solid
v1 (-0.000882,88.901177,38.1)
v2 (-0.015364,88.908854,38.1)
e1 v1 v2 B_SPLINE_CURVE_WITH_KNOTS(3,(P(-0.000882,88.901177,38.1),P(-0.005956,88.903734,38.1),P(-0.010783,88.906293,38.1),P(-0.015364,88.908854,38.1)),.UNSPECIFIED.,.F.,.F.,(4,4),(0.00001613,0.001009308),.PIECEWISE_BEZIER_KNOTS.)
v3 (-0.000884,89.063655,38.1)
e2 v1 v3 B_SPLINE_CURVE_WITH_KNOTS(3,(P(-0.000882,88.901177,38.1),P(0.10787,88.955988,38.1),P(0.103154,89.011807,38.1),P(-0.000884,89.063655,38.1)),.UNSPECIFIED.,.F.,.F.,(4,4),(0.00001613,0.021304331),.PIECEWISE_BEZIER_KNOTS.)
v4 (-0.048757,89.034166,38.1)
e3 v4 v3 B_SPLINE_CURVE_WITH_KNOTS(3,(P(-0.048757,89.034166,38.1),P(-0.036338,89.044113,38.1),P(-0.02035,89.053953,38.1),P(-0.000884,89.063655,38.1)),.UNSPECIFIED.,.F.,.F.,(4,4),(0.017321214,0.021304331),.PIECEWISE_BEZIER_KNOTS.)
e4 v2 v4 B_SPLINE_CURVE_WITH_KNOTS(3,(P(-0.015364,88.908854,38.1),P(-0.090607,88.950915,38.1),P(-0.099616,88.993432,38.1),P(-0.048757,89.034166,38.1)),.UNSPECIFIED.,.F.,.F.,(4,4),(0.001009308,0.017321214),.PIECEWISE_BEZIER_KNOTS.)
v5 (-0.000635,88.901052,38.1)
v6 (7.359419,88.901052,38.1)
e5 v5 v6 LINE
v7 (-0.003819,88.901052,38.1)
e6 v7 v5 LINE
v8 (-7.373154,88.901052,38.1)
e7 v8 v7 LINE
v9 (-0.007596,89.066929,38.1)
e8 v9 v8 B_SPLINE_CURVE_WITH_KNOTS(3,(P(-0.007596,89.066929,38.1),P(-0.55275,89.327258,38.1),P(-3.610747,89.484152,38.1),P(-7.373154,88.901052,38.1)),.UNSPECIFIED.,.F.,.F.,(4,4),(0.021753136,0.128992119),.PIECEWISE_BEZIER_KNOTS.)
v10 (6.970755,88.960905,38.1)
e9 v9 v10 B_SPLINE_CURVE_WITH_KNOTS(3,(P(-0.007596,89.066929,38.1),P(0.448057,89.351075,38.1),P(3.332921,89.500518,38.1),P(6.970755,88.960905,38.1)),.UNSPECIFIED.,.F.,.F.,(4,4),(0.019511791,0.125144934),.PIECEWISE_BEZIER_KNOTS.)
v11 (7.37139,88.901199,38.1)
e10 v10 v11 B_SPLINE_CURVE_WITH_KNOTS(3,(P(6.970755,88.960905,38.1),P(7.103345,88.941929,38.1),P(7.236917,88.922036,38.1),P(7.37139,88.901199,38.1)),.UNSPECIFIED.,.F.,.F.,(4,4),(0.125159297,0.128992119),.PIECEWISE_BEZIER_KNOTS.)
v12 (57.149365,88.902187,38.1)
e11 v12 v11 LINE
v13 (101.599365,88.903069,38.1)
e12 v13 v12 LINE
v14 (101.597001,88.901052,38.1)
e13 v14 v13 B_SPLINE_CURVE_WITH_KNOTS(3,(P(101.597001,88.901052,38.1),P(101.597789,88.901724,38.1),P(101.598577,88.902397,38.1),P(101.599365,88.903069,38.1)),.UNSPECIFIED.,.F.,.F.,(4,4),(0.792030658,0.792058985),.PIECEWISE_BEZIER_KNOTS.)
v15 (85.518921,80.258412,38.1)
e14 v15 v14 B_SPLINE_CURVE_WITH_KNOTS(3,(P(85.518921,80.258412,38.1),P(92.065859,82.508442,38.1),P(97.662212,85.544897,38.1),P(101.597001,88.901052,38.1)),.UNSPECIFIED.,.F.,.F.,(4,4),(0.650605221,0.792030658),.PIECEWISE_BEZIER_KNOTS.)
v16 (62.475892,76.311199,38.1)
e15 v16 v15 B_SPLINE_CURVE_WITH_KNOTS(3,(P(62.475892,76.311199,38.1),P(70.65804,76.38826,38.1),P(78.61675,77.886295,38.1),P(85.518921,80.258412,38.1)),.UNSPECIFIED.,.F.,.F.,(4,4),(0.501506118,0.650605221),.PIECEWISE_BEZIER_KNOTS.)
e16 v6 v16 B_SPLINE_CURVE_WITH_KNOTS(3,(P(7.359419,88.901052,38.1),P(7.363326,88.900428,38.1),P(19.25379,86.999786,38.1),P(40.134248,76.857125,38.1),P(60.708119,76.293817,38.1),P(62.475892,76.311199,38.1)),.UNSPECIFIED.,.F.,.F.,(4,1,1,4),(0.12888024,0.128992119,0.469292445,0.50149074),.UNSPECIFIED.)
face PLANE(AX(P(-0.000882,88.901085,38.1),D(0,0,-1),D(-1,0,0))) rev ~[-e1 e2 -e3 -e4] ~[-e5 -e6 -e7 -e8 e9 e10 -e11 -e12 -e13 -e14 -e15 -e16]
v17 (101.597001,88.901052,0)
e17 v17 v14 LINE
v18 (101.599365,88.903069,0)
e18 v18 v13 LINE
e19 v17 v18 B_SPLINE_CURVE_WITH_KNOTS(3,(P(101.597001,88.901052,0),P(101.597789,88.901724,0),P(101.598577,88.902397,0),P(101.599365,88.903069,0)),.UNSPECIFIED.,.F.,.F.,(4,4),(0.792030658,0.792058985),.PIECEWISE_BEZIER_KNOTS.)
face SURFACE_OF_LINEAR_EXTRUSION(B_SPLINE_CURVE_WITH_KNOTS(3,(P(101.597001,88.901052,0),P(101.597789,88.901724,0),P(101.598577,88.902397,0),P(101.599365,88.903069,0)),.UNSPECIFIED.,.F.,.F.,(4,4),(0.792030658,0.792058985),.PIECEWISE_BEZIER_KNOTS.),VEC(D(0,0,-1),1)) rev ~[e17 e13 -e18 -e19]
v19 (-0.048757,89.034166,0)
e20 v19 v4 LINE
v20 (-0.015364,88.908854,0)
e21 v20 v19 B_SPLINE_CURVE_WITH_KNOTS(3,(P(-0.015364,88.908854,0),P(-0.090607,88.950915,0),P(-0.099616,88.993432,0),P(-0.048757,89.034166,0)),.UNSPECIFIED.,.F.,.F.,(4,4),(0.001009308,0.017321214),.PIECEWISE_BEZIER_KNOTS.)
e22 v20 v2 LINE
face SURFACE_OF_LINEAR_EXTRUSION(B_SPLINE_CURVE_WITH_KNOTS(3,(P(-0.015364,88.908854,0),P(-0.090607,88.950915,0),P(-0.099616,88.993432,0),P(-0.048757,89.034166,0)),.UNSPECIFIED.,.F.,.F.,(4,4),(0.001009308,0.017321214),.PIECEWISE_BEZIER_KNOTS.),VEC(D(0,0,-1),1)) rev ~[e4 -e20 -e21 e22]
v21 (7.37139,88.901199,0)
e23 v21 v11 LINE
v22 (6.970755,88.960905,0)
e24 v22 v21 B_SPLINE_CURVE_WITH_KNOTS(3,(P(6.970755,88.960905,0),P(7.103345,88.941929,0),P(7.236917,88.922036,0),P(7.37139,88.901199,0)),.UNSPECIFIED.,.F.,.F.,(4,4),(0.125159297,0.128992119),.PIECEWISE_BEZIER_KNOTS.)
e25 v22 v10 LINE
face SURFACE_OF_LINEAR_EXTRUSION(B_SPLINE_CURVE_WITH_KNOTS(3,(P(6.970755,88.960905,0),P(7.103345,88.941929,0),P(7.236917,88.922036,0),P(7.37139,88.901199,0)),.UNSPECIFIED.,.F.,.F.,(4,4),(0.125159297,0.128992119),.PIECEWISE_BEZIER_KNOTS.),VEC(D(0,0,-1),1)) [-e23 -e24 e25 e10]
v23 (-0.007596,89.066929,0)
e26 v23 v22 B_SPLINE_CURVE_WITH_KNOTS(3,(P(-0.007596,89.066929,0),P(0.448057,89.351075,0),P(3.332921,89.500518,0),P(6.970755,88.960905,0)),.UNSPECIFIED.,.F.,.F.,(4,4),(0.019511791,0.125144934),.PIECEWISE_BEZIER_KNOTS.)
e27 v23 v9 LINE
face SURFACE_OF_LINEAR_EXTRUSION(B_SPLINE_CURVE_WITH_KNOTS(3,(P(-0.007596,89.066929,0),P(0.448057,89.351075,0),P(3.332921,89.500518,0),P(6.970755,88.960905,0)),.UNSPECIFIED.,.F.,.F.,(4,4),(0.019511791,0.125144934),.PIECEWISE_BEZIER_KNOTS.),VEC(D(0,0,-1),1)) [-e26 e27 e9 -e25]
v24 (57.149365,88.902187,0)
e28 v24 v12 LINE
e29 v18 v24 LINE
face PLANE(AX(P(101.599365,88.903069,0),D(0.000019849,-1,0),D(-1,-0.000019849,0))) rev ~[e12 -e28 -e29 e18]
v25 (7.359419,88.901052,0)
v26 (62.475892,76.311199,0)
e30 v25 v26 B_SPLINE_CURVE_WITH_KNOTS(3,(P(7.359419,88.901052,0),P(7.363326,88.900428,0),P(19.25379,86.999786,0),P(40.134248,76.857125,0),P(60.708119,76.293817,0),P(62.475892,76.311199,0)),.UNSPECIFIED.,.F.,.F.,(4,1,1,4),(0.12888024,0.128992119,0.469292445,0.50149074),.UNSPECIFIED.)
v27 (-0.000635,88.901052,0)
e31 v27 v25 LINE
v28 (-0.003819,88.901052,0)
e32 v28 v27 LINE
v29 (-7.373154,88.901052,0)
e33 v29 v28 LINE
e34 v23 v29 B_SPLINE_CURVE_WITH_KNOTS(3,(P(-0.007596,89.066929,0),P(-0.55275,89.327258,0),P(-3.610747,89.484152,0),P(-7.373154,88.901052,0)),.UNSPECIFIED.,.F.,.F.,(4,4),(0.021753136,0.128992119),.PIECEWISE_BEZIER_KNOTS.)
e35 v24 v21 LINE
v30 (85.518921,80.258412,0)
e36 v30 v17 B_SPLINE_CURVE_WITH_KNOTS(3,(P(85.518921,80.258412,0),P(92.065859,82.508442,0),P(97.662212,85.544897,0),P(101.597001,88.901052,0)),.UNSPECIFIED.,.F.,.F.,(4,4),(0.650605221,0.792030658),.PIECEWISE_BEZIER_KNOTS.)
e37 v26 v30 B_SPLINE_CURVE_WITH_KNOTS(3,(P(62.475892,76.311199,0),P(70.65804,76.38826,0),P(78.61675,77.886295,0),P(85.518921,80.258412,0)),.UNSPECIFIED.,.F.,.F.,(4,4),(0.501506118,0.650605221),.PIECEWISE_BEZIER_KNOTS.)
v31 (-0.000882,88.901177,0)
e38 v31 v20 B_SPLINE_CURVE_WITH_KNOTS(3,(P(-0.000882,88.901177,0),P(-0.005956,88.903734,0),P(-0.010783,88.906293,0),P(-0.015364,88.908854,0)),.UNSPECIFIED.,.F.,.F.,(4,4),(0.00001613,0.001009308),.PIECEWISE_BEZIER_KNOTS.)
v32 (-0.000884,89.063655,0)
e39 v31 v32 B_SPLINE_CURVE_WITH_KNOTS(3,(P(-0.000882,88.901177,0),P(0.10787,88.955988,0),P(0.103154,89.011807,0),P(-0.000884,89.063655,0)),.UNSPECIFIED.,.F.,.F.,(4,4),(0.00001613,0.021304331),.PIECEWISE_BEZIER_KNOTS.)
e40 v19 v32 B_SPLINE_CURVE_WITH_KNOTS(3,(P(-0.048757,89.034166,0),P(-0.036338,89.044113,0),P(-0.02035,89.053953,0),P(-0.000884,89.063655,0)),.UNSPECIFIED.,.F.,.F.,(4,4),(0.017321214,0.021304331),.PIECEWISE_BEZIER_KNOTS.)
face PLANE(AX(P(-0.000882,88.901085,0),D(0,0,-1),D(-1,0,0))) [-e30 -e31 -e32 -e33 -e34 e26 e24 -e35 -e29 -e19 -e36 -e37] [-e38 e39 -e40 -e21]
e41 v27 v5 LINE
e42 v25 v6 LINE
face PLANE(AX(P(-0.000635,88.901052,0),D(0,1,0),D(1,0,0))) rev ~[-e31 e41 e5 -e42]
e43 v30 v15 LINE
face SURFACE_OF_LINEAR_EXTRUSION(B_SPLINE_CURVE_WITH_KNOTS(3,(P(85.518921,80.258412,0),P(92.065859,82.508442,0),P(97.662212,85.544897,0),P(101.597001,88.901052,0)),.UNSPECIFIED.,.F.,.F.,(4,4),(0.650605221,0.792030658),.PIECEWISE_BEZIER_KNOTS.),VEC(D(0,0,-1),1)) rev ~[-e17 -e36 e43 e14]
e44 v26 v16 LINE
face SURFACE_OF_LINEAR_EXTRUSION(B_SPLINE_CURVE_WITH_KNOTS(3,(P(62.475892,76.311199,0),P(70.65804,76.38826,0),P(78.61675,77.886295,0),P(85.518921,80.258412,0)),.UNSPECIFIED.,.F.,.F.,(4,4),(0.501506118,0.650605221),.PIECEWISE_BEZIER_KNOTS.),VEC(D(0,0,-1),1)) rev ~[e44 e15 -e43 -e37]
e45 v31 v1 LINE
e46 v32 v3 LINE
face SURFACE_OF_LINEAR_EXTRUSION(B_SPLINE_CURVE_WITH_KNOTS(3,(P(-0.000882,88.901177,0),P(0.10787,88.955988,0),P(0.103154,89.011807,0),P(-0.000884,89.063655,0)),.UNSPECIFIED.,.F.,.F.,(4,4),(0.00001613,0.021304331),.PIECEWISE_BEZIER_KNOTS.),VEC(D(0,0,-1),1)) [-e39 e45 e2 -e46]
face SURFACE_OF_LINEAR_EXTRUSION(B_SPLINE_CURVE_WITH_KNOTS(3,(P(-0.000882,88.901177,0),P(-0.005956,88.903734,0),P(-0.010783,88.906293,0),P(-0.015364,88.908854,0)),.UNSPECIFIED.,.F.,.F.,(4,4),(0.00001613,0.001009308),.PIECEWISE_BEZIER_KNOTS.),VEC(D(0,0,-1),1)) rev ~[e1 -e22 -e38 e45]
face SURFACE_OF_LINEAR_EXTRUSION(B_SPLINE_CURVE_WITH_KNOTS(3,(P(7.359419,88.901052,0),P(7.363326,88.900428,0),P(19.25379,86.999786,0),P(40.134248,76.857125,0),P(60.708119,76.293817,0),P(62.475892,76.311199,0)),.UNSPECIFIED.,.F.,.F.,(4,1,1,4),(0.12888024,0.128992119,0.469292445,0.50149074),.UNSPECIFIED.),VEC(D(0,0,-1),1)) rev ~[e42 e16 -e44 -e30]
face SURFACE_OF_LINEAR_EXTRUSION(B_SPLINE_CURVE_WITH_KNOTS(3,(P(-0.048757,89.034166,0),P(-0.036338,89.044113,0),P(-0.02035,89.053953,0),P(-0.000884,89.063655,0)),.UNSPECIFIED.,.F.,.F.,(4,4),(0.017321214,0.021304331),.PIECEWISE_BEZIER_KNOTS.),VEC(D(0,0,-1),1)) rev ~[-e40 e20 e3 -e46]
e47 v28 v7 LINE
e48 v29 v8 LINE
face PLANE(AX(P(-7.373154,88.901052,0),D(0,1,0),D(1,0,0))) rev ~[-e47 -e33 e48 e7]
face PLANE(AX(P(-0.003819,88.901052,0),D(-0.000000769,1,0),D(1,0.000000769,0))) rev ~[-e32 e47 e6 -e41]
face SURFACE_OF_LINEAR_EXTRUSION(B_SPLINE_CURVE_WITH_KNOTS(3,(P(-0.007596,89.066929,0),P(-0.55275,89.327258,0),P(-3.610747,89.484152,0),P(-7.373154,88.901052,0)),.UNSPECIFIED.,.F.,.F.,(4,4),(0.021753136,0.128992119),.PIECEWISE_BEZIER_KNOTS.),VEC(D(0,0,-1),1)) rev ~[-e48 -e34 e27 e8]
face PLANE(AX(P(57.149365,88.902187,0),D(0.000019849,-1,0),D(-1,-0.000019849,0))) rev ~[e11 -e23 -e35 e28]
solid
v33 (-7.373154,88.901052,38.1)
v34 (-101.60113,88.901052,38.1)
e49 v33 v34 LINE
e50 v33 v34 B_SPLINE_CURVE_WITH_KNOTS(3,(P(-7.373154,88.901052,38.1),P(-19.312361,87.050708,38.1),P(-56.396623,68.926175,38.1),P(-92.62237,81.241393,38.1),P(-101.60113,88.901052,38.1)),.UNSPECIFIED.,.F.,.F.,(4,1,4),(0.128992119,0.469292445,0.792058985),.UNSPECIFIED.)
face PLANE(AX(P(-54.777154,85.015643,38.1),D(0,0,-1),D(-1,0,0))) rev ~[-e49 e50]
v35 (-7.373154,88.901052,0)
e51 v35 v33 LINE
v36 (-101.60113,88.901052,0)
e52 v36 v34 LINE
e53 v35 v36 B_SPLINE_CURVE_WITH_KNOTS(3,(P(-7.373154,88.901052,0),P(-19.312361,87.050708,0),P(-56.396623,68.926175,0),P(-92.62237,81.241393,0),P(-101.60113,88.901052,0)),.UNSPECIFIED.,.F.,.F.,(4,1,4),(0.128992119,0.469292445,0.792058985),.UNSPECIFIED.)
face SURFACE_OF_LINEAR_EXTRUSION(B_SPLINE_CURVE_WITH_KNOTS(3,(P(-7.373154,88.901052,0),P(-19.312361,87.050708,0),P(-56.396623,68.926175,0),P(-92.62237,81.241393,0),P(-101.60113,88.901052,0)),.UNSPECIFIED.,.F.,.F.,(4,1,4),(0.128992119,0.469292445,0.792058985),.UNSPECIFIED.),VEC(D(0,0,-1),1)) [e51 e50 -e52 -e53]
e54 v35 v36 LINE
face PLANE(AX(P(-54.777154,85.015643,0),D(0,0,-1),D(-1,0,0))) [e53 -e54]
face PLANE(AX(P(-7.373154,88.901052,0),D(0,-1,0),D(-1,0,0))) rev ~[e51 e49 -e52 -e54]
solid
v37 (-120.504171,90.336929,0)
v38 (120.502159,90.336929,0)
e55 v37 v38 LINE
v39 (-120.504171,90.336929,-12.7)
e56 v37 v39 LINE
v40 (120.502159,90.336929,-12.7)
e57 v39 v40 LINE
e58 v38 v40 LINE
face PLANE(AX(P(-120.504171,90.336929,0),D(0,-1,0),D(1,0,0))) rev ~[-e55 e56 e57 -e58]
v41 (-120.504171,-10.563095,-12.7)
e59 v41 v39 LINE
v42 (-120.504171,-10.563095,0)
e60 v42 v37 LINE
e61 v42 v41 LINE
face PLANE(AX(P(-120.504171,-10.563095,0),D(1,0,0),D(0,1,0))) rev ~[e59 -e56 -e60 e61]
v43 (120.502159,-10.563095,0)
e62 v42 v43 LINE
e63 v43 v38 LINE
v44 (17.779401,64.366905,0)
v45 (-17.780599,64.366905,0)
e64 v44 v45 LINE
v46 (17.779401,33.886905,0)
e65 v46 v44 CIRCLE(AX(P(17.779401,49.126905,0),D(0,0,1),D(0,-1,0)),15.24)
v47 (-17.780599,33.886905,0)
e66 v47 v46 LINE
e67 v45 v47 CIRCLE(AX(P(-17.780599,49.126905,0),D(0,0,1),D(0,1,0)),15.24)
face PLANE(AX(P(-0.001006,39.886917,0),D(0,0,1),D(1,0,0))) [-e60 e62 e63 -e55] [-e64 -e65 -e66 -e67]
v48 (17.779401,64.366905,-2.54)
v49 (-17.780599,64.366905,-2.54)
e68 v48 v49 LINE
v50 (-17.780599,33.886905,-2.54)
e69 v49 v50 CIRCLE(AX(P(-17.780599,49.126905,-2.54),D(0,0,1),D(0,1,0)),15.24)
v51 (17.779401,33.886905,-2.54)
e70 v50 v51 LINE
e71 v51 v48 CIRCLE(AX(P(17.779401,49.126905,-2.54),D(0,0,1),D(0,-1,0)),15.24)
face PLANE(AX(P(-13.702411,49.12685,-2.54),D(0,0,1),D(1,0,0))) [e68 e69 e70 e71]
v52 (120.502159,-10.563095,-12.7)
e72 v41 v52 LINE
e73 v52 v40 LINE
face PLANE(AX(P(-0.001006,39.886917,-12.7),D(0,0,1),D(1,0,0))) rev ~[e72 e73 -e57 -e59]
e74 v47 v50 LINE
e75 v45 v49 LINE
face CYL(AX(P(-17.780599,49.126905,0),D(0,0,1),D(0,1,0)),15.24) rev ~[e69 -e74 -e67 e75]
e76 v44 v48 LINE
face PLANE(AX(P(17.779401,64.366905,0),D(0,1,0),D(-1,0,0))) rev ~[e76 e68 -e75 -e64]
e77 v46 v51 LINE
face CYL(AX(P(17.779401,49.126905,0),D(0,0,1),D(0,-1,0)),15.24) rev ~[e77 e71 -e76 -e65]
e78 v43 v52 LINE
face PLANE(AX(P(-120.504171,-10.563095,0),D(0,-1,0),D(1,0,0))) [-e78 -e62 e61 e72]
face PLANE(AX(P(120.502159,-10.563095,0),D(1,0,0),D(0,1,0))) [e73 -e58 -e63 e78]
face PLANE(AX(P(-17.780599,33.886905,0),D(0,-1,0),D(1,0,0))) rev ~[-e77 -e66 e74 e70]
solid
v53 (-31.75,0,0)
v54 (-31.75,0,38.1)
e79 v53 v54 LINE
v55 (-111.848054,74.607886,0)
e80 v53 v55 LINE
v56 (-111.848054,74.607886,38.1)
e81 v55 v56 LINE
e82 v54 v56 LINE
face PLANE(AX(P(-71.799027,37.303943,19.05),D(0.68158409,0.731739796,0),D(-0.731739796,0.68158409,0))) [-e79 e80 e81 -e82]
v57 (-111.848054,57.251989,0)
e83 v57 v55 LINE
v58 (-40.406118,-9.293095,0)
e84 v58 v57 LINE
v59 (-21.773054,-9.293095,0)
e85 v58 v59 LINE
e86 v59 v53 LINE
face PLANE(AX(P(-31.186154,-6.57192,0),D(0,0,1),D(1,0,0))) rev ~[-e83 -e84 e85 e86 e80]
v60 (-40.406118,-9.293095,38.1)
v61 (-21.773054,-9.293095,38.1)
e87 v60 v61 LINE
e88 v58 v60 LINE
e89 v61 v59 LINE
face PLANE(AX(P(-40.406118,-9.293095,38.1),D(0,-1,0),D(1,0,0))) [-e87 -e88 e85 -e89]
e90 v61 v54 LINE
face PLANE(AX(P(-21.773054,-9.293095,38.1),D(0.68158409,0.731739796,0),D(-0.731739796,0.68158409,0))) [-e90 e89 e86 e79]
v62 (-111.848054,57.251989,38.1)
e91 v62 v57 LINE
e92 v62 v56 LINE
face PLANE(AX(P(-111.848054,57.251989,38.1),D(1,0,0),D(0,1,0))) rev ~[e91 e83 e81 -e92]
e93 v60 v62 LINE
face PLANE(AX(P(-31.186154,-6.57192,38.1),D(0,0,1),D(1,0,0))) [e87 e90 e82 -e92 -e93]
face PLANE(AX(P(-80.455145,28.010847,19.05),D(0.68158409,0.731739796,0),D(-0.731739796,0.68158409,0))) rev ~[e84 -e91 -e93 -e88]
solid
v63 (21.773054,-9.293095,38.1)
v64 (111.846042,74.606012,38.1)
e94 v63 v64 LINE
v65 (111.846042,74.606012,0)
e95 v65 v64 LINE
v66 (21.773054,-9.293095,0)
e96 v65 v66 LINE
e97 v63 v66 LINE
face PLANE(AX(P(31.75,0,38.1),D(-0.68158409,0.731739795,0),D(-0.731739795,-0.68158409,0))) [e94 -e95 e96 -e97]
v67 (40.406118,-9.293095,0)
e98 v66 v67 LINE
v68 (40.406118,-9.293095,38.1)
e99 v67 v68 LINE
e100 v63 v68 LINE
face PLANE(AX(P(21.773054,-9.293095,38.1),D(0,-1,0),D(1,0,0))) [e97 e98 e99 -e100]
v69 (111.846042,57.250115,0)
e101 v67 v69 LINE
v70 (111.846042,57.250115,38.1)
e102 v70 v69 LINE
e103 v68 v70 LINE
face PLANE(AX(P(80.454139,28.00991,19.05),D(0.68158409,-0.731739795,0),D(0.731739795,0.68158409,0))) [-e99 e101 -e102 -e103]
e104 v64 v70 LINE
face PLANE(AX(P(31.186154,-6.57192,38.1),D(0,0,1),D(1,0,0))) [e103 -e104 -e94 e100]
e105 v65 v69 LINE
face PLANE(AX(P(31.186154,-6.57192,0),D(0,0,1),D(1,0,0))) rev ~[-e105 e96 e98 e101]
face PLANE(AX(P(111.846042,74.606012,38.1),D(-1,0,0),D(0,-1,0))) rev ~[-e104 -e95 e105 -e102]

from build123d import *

# Parameters (mm, degrees)
F1_DEPTH         = 38.1
F2_E3_MIRRORCS_W = 109.4597315367
F2_E3_MIRRORCS_H = 38.1
F3_DEPTH         = 12.7
F2_E1_W          = 109.4624810587
F2_E1_H          = 38.1
F4_DEPTH         = 12.7
F6_DEPTH         = 38.1
F8_DEPTH         = 38.1
F9_W             = 241.0063309582
F9_H             = 100.9000240942
F10_DEPTH        = 12.7
F12_DEPTH        = 2.54
F14_DEPTH        = 38.1
F16_DEPTH        = 38.1


with BuildPart() as f1:
    # F0 (on Top) → F1 (new body)
    with BuildSketch(Plane.XY):
        with BuildLine():
            add(Edge.make_bspline(
                [(-7.3731541722, 88.9010522698), (-19.31236057, 87.050708456), (-56.3966234299, 68.9261750439), (-92.6223703207, 81.2413929209), (-101.6011297031, 88.9010522698)],
                knots=[0.1289921189, 0.1289921189, 0.1289921189, 0.1289921189, 0.4692924446, 0.7920589848, 0.7920589848, 0.7920589848, 0.7920589848], degree=3))
            Line((-7.3731541722, 88.9010522698), (-57.1511297031, 88.9010522698))
            Line((-57.1511297031, 88.9010522698), (-101.6011297031, 88.9010522698))
        make_face()
        with BuildLine():
            add(Edge.make_bspline(
                [(-0.0011297031, 88.9010522698), (-0.0010471723, 88.901093798), (-0.0009647066, 88.9011353269), (-0.0008823061, 88.9011768563)],
                knots=[0, 0, 0, 0, 1.61298e-05, 1.61298e-05, 1.61298e-05, 1.61298e-05], degree=3))
            Line((-0.0011297031, 88.9010522698), (-0.0006349067, 88.9010522698))
            add(Edge.make_bspline(
                [(-0.0006349067, 88.9010522747), (-0.0007174383, 88.9010938013), (-0.0007999048, 88.9011353285), (-0.0008823061, 88.9011768563)],
                knots=[0, 0, 0, 0, 1.61298e-05, 1.61298e-05, 1.61298e-05, 1.61298e-05], degree=3))
        make_face()
        with BuildLine():
            Line((-0.0038189409, 88.9010522698), (-0.0011297031, 88.9010522698))
            add(Edge.make_bspline(
                [(-0.0011297031, 88.9010522698), (-0.0010471723, 88.901093798), (-0.0009647066, 88.9011353269), (-0.0008823061, 88.9011768563)],
                knots=[0, 0, 0, 0, 1.61298e-05, 1.61298e-05, 1.61298e-05, 1.61298e-05], degree=3))
            add(Edge.make_bspline(
                [(-0.0008823061, 88.9011768563), (-0.0059560813, 88.9037338865), (-0.0107828824, 88.9062931167), (-0.0153641459, 88.9088540413)],
                knots=[1.61298e-05, 1.61298e-05, 1.61298e-05, 1.61298e-05, 0.0010093075, 0.0010093075, 0.0010093075, 0.0010093075], degree=3))
            add(Edge.make_bspline(
                [(-0.0038189409, 88.9010522698), (-0.0078539791, 88.9036552478), (-0.0117020651, 88.9062559427), (-0.0153641459, 88.9088540413)],
                knots=[0.0002095209, 0.0002095209, 0.0002095209, 0.0002095209, 0.001082787, 0.001082787, 0.001082787, 0.001082787], degree=3))
        make_face()
        with BuildLine():
            Line((-7.3731541722, 88.9010522698), (-0.0038189409, 88.9010522698))
            add(Edge.make_bspline(
                [(-0.0038189409, 88.9010522698), (-0.0078539791, 88.9036552478), (-0.0117020651, 88.9062559427), (-0.0153641459, 88.9088540413)],
                knots=[0.0002095209, 0.0002095209, 0.0002095209, 0.0002095209, 0.001082787, 0.001082787, 0.001082787, 0.001082787], degree=3))
            add(Edge.make_bspline(
                [(-0.0153641459, 88.9088540413), (-0.0906066198, 88.9509145567), (-0.0996162199, 88.9934321228), (-0.0487573192, 89.0341663757)],
                knots=[0.0010093075, 0.0010093075, 0.0010093075, 0.0010093075, 0.0173212144, 0.0173212144, 0.0173212144, 0.0173212144], degree=3))
            add(Edge.make_bspline(
                [(-0.0487573192, 89.0341663757), (-0.0385667228, 89.045259585), (-0.0248162276, 89.0561903305), (-0.0075963078, 89.0669286912)],
                knots=[0.0155197372, 0.0155197372, 0.0155197372, 0.0155197372, 0.0195117913, 0.0195117913, 0.0195117913, 0.0195117913], degree=3))
            add(Edge.make_bspline(
                [(-0.0075963078, 89.0669286912), (-0.5527500342, 89.3272580379), (-3.6107471198, 89.4841518814), (-7.3731541722, 88.9010522698)],
                knots=[0.0217531364, 0.0217531364, 0.0217531364, 0.0217531364, 0.1289921189, 0.1289921189, 0.1289921189, 0.1289921189], degree=3))
        make_face()
        with BuildLine():
            Line((7.358503656, 88.9011983473), (-0.0006349067, 88.9010522747))
            Line((-0.0006349067, 88.9010522698), (7.3594185793, 88.9010522698))
            add(Edge.make_bspline(
                [(7.358503656, 88.9011983473), (7.3588086257, 88.9011496596), (7.3591136001, 88.9011009671), (7.3594185793, 88.9010522698)],
                knots=[0.1288715075, 0.1288715075, 0.1288715075, 0.1288715075, 0.1288802405, 0.1288802405, 0.1288802405, 0.1288802405], degree=3))
        make_face()
        with BuildLine():
            add(Edge.make_bspline(
                [(-0.0006349067, 88.9010522747), (-0.0007174383, 88.9010938013), (-0.0007999048, 88.9011353285), (-0.0008823061, 88.9011768563)],
                knots=[0, 0, 0, 0, 1.61298e-05, 1.61298e-05, 1.61298e-05, 1.61298e-05], degree=3))
            Line((-0.0006349067, 88.9010522747), (7.358503656, 88.9011983473))
            add(Edge.make_bspline(
                [(6.9707545503, 88.9609054579), (7.0990916617, 88.9418687773), (7.2283658962, 88.9219745203), (7.358503656, 88.9011983473)],
                knots=[0.1251449345, 0.1251449345, 0.1251449345, 0.1251449345, 0.1288715075, 0.1288715075, 0.1288715075, 0.1288715075], degree=3))
            add(Edge.make_bspline(
                [(-0.0008839186, 89.0636547943), (0.5066620671, 89.3166069603), (3.3780640661, 89.4750941094), (6.9707545503, 88.9609054579)],
                knots=[0.0213043311, 0.0213043311, 0.0213043311, 0.0213043311, 0.1251592971, 0.1251592971, 0.1251592971, 0.1251592971], degree=3))
            add(Edge.make_bspline(
                [(-0.0008823061, 88.9011768563), (0.1078701091, 88.9559875108), (0.1031539373, 89.0118066991), (-0.0008839186, 89.0636547943)],
                knots=[1.61298e-05, 1.61298e-05, 1.61298e-05, 1.61298e-05, 0.0213043311, 0.0213043311, 0.0213043311, 0.0213043311], degree=3))
        make_face()
        with BuildLine():
            add(Edge.make_bspline(
                [(7.358503656, 88.9011983473), (7.3588086257, 88.9011496596), (7.3591136001, 88.9011009671), (7.3594185793, 88.9010522698)],
                knots=[0.1288715075, 0.1288715075, 0.1288715075, 0.1288715075, 0.1288802405, 0.1288802405, 0.1288802405, 0.1288802405], degree=3))
            Line((7.3594185793, 88.9010522698), (7.372333804, 88.9010522698))
            add(Edge.make_bspline(
                [(7.371389561, 88.901198603), (7.3717043037, 88.9011498305), (7.3720190514, 88.9011010527), (7.372333804, 88.9010522698)],
                knots=[0.1289921189, 0.1289921189, 0.1289921189, 0.1289921189, 0.1290010899, 0.1290010899, 0.1290010899, 0.1290010899], degree=3))
            Line((7.371389561, 88.901198603), (7.358503656, 88.9011983473))
        make_face()
        with BuildLine():
            Line((7.372333804, 88.9010522698), (7.3594185793, 88.9010522698))
            add(Edge.make_bspline(
                [(7.3594185793, 88.9010522698), (7.3633256696, 88.9004284077), (19.2537900005, 86.9997857358), (40.134248152, 76.8571245778), (60.7081186709, 76.2938170337), (62.4758923018, 76.3111989879)],
                knots=[0.1288802405, 0.1288802405, 0.1288802405, 0.1288802405, 0.1289921189, 0.4692924446, 0.5014907397, 0.5014907397, 0.5014907397, 0.5014907397], degree=3))
            add(Edge.make_bspline(
                [(7.372333804, 88.9010522698), (19.311636162, 87.0506013639), (40.1454385751, 76.8690456691), (60.7080947753, 76.2945495342), (62.4758923018, 76.3111989879)],
                knots=[0.1290010899, 0.1290010899, 0.1290010899, 0.1290010899, 0.4692924446, 0.5015061184, 0.5015061184, 0.5015061184, 0.5015061184], degree=3))
        make_face()
        with BuildLine():
            add(Edge.make_bspline(
                [(6.9707545503, 88.9609054579), (7.0990916617, 88.9418687773), (7.2283658962, 88.9219745203), (7.358503656, 88.9011983473)],
                knots=[0.1251449345, 0.1251449345, 0.1251449345, 0.1251449345, 0.1288715075, 0.1288715075, 0.1288715075, 0.1288715075], degree=3))
            Line((7.358503656, 88.9011983473), (7.371389561, 88.901198603))
            add(Edge.make_bspline(
                [(6.9707545503, 88.9609054579), (7.103344668, 88.9419290573), (7.2369171933, 88.9220364605), (7.371389561, 88.901198603)],
                knots=[0.1251592971, 0.1251592971, 0.1251592971, 0.1251592971, 0.1289921189, 0.1289921189, 0.1289921189, 0.1289921189], degree=3))
        make_face()
        with BuildLine():
            add(Edge.make_bspline(
                [(-0.0487573192, 89.0341663757), (-0.0363383579, 89.0441130537), (-0.0203496698, 89.0539533996), (-0.0008839186, 89.0636547943)],
                knots=[0.0173212144, 0.0173212144, 0.0173212144, 0.0173212144, 0.0213043311, 0.0213043311, 0.0213043311, 0.0213043311], degree=3))
            add(Edge.make_bspline(
                [(-0.0008839186, 89.0636547943), (-0.0030772808, 89.0647478738), (-0.0053147881, 89.0658391883), (-0.0075963078, 89.0669286912)],
                knots=[0.0213043311, 0.0213043311, 0.0213043311, 0.0213043311, 0.0217531364, 0.0217531364, 0.0217531364, 0.0217531364], degree=3))
            add(Edge.make_bspline(
                [(-0.0487573192, 89.0341663757), (-0.0385667228, 89.045259585), (-0.0248162276, 89.0561903305), (-0.0075963078, 89.0669286912)],
                knots=[0.0155197372, 0.0155197372, 0.0155197372, 0.0155197372, 0.0195117913, 0.0195117913, 0.0195117913, 0.0195117913], degree=3))
        make_face()
        with BuildLine():
            add(Edge.make_bspline(
                [(-0.0008839186, 89.0636547943), (-0.0030772808, 89.0647478738), (-0.0053147881, 89.0658391883), (-0.0075963078, 89.0669286912)],
                knots=[0.0213043311, 0.0213043311, 0.0213043311, 0.0213043311, 0.0217531364, 0.0217531364, 0.0217531364, 0.0217531364], degree=3))
            add(Edge.make_bspline(
                [(-0.0008839186, 89.0636547943), (0.5066620671, 89.3166069603), (3.3780640661, 89.4750941094), (6.9707545503, 88.9609054579)],
                knots=[0.0213043311, 0.0213043311, 0.0213043311, 0.0213043311, 0.1251592971, 0.1251592971, 0.1251592971, 0.1251592971], degree=3))
            add(Edge.make_bspline(
                [(-0.0075963078, 89.0669286912), (0.4480573981, 89.3510748377), (3.3329208845, 89.5005177095), (6.9707545503, 88.9609054579)],
                knots=[0.0195117913, 0.0195117913, 0.0195117913, 0.0195117913, 0.1251449345, 0.1251449345, 0.1251449345, 0.1251449345], degree=3))
        make_face()
        with BuildLine():
            add(Edge.make_bspline(
                [(7.371389561, 88.901198603), (7.3717043037, 88.9011498305), (7.3720190514, 88.9011010527), (7.372333804, 88.9010522698)],
                knots=[0.1289921189, 0.1289921189, 0.1289921189, 0.1289921189, 0.1290010899, 0.1290010899, 0.1290010899, 0.1290010899], degree=3))
            Line((7.372333804, 88.9010522698), (57.1488702969, 88.9010522698))
            Line((57.1488702969, 88.9010522698), (101.5970009453, 88.9010522698))
            add(Edge.make_bspline(
                [(101.5970009453, 88.9010522698), (101.5977890547, 88.9017244829), (101.5985770973, 88.9023967089), (101.5993650733, 88.9030689477)],
                knots=[0.7920306583, 0.7920306583, 0.7920306583, 0.7920306583, 0.7920589848, 0.7920589848, 0.7920589848, 0.7920589848], degree=3))
            Line((101.5993650733, 88.9030689477), (57.1493650821, 88.9021866532))
            Line((57.1493650821, 88.9021866532), (7.371389561, 88.901198603))
        make_face()
        with BuildLine():
            Line((57.1488702969, 88.9010522698), (7.372333804, 88.9010522698))
            add(Edge.make_bspline(
                [(7.372333804, 88.9010522698), (19.311636162, 87.0506013639), (40.1454385751, 76.8690456691), (60.7080947753, 76.2945495342), (62.4758923018, 76.3111989879)],
                knots=[0.1290010899, 0.1290010899, 0.1290010899, 0.1290010899, 0.4692924446, 0.5015061184, 0.5015061184, 0.5015061184, 0.5015061184], degree=3))
            add(Edge.make_bspline(
                [(62.4758923018, 76.3111989879), (70.6608896738, 76.3916794562), (78.6185391976, 77.8886425606), (85.5189213309, 80.2584115087)],
                knots=[0.5014907397, 0.5014907397, 0.5014907397, 0.5014907397, 0.6505725884, 0.6505725884, 0.6505725884, 0.6505725884], degree=3))
            add(Edge.make_bspline(
                [(85.5189213309, 80.2584115087), (92.0658589973, 82.5084423933), (97.6622116963, 85.5448972365), (101.5970009453, 88.9010522698)],
                knots=[0.650605221, 0.650605221, 0.650605221, 0.650605221, 0.7920306583, 0.7920306583, 0.7920306583, 0.7920306583], degree=3))
            Line((101.5970009453, 88.9010522698), (57.1488702969, 88.9010522698))
        make_face()
        with BuildLine():
            add(Edge.make_bspline(
                [(62.4758923018, 76.3111989879), (70.6608896738, 76.3916794562), (78.6185391976, 77.8886425606), (85.5189213309, 80.2584115087)],
                knots=[0.5014907397, 0.5014907397, 0.5014907397, 0.5014907397, 0.6505725884, 0.6505725884, 0.6505725884, 0.6505725884], degree=3))
            add(Edge.make_bspline(
                [(62.4758923018, 76.3111989879), (70.6580396422, 76.3882600096), (78.6167504823, 77.8862952047), (85.5189213309, 80.2584115087)],
                knots=[0.5015061184, 0.5015061184, 0.5015061184, 0.5015061184, 0.650605221, 0.650605221, 0.650605221, 0.650605221], degree=3))
        make_face()
    extrude(amount=F1_DEPTH)


with BuildPart() as f3:
    # F2_E3_MirrorCS (on explicit) → F3 (new body)
    with BuildSketch(Plane(origin=(31.75, 0, 0), x_dir=(0.7317397952, 0.6815840902, 0), z_dir=(0.6815840902, -0.7317397952, 0))):
        with Locations((54.7298657684, 19.05)):
            Rectangle(F2_E3_MIRRORCS_W, F2_E3_MIRRORCS_H)
    extrude(amount=F3_DEPTH)

    # F7 (on face) → F8 (join)
    with BuildSketch(Plane.XY.offset(38.1)):
        Polygon((40.406117946, -9.2930953996), (31.75, 0), (21.7730539089, -9.2930953996), align=None)
    extrude(amount=-F8_DEPTH)

    # F15 (on face) → F16 (cut)
    with BuildSketch(Plane.XY.offset(38.1)):
        Polygon((120.5021594878, 65.3129161372), (111.8460415418, 74.6060115367), (111.8460415418, 57.2501152433), align=None)
    extrude(amount=-F16_DEPTH, mode=Mode.SUBTRACT)


with BuildPart() as f4:
    # F2_E1 (on explicit) → F4 (new body)
    with BuildSketch(Plane(origin=(-31.75, 0, 0), x_dir=(-0.7317397957, 0.6815840897, 0), z_dir=(0.6815840897, 0.7317397957, 0))):
        with Locations((54.7312405293, 19.05)):
            Rectangle(F2_E1_W, F2_E1_H)
    extrude(amount=-F4_DEPTH)

    # F5 (on face) → F6 (join)
    with BuildSketch(Plane.XY.offset(38.1)):
        Polygon((-21.7730538874, -9.2930954059), (-31.75, 0), (-40.4061179392, -9.2930954059), align=None)
    extrude(amount=-F6_DEPTH)

    # F13 (on face) → F14 (cut)
    with BuildSketch(Plane.XY.offset(38.1)):
        Polygon((-111.8480535312, 57.2519892268), (-111.8480535312, 74.6078855084), (-120.5041714704, 65.3147901024), align=None)
    extrude(amount=-F14_DEPTH, mode=Mode.SUBTRACT)


with BuildPart() as f10:
    # F9 (on Top) → F10 (new body)
    with BuildSketch(Plane.XY):
        with Locations((-0.0010059913, 39.8869166412)):
            Rectangle(F9_W, F9_H)
    extrude(amount=-F10_DEPTH)

    # F11 (on face) → F12 (cut)
    with BuildSketch(Plane.XY):
        with BuildLine():
            Line((-17.7805990966, 33.8869045941), (-0.0004435264, 33.8869045941))
            Line((-0.0004435264, 33.8869045941), (-0.0008424617, 64.3669045941))
            Line((-0.0008424617, 64.3669045941), (-17.7805990966, 64.3669045941))
            ThreePointArc((-17.7805990966, 64.3669045941), (-33.0205990966, 49.1269045941), (-17.7805990966, 33.8869045941))
        make_face()
        with BuildLine():
            Line((-0.0008424617, 64.3669045941), (-0.0004435264, 33.8869045941))
            Line((-0.0004435264, 33.8869045941), (17.7794009034, 33.8869045941))
            ThreePointArc((17.7794009034, 33.8869045941), (33.0194009034, 49.1269045941), (17.7794009034, 64.3669045941))
            Line((17.7794009034, 64.3669045941), (-0.0008424617, 64.3669045941))
        make_face()
    extrude(amount=-F12_DEPTH, mode=Mode.SUBTRACT)


solid = Compound([f1.part, f3.part, f4.part, f10.part])
